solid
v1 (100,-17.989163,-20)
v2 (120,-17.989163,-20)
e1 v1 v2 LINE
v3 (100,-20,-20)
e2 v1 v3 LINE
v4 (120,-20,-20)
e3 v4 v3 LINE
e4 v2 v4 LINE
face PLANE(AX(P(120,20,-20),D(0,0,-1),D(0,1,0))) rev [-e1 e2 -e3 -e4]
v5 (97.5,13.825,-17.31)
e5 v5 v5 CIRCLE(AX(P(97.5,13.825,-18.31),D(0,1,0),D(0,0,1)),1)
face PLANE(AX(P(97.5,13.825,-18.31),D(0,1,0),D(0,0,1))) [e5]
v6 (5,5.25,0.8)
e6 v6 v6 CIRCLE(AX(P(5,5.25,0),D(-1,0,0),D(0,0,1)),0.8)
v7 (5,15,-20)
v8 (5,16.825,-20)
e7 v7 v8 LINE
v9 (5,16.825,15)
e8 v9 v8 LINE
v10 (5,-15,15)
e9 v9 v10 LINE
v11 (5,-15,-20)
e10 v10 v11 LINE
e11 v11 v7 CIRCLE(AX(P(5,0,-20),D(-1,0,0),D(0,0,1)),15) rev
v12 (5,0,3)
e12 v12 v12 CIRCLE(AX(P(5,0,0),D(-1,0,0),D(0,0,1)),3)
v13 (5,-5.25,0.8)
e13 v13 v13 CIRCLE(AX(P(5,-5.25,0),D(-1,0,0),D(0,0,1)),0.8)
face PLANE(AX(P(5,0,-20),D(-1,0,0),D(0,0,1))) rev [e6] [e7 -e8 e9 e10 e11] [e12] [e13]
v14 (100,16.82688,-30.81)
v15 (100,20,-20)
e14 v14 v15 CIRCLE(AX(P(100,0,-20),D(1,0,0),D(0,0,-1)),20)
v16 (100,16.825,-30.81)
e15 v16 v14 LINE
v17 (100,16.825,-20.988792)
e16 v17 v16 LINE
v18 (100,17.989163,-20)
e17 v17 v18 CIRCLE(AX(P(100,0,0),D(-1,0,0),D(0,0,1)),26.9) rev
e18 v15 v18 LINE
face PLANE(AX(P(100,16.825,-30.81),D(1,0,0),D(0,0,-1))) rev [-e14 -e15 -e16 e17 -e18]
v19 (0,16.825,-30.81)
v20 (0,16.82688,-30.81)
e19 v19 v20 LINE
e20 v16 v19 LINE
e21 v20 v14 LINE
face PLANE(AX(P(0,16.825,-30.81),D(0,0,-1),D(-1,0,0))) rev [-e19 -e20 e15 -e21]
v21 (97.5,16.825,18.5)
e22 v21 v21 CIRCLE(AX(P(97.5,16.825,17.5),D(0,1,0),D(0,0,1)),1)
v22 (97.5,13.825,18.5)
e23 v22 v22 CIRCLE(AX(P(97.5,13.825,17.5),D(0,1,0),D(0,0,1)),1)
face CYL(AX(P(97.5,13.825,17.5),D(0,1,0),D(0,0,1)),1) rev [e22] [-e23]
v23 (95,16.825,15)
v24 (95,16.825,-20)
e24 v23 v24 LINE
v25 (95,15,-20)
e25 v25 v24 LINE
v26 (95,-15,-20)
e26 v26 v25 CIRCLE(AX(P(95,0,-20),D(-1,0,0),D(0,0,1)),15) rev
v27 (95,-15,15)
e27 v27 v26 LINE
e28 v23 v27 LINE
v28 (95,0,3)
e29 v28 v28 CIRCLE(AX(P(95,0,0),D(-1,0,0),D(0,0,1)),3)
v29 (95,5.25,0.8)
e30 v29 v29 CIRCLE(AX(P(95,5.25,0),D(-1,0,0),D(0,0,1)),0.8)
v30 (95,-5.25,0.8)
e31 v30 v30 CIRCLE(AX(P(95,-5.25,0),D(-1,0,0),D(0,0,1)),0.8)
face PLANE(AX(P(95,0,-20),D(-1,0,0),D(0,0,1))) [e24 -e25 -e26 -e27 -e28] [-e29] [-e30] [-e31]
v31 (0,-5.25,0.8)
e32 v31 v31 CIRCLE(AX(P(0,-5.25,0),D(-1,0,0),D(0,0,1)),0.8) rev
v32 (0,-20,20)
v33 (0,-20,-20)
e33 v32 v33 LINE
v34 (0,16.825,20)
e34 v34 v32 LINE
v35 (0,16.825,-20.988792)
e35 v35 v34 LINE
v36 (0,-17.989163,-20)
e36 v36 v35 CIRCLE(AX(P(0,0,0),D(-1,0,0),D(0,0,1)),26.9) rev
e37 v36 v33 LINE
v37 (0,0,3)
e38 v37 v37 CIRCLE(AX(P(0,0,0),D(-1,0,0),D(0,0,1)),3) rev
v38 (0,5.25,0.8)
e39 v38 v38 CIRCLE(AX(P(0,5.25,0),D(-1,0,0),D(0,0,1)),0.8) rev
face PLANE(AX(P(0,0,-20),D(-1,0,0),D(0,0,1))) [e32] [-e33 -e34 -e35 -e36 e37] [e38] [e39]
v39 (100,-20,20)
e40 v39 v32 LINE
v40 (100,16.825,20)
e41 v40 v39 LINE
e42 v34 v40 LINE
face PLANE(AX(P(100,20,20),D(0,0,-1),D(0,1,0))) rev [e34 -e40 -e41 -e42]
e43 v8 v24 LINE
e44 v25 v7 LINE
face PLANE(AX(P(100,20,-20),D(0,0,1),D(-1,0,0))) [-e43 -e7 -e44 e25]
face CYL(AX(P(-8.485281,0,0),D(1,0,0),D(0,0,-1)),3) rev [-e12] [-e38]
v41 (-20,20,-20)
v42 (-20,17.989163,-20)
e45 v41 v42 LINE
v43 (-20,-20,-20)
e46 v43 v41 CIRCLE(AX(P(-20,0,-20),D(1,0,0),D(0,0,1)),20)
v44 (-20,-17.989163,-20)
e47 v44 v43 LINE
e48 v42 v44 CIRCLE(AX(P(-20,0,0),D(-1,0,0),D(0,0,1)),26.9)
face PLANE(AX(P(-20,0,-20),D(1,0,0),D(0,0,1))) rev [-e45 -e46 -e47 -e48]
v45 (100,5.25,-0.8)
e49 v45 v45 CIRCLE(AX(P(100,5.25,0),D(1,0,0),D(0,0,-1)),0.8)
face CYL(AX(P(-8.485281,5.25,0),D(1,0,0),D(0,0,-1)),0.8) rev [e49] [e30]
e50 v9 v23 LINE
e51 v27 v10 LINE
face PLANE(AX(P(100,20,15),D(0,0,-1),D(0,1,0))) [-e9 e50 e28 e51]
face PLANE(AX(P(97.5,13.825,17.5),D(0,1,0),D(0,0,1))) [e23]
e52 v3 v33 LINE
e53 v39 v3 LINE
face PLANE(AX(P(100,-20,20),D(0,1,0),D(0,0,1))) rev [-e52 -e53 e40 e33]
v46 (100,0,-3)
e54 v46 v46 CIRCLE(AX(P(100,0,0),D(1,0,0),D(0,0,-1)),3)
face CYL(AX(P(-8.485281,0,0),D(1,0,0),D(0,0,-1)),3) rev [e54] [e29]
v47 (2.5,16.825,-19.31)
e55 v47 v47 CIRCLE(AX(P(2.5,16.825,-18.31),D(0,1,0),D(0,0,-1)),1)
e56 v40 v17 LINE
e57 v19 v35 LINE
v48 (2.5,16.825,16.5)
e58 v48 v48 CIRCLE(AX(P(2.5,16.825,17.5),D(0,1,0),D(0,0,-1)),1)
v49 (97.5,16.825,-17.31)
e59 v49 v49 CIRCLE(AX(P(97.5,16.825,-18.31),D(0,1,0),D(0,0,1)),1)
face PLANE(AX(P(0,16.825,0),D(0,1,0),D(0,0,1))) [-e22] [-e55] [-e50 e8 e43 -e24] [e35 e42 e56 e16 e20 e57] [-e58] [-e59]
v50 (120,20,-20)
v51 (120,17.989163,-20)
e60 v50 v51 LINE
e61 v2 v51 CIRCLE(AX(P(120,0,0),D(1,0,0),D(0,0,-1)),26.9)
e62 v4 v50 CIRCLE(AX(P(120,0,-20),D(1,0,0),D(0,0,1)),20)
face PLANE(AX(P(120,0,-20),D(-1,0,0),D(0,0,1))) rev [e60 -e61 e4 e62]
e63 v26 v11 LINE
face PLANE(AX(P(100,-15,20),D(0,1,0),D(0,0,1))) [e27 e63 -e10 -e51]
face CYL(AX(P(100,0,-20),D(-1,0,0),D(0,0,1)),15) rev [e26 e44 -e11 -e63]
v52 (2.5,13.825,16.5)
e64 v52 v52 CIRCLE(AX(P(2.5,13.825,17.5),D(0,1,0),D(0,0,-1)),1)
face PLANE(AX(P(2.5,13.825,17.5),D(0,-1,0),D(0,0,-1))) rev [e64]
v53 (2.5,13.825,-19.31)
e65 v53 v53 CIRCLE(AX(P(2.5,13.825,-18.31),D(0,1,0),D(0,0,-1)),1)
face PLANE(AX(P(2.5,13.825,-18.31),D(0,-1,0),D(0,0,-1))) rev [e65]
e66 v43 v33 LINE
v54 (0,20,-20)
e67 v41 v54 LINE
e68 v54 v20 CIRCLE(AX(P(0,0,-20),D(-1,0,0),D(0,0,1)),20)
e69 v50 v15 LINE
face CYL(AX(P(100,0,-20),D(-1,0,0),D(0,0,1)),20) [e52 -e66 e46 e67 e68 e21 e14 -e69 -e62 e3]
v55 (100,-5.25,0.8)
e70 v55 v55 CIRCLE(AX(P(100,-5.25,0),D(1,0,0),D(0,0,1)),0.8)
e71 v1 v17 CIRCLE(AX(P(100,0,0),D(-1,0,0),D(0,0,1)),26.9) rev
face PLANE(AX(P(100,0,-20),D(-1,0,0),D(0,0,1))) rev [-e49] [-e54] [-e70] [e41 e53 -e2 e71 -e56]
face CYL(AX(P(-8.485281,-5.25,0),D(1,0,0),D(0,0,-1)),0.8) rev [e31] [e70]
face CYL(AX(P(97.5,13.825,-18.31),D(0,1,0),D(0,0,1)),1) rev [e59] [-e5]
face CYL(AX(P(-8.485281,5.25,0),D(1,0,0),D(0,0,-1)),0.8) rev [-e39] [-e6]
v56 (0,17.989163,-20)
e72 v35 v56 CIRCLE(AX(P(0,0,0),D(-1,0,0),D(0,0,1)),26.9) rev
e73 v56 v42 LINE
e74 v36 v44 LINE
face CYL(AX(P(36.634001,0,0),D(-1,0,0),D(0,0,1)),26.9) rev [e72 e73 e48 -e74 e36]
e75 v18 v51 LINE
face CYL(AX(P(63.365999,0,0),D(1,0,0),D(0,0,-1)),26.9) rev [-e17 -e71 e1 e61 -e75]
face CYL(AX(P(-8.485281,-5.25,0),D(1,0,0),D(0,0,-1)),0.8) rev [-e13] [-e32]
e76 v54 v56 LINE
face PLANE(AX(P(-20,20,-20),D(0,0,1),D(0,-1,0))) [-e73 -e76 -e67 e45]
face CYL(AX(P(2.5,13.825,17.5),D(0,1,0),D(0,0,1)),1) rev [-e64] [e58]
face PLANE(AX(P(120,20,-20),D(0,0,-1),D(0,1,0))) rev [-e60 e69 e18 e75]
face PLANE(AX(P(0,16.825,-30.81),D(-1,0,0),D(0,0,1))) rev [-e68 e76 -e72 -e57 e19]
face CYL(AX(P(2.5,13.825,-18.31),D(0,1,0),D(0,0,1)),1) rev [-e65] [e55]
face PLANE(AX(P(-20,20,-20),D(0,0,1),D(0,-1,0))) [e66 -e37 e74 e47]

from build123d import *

# Parameters (mm, degrees)
BOSS_EXTRUDE1_DEPTH = 100
SHELL3_START        = 5
SHELL3_DEPTH        = 90
BOSS_EXTRUDE2_DEPTH = 20
SKETCH7_W           = 100
SKETCH7_H           = 50.81
CUT_EXTRUDE6_DEPTH  = 3.175
CUT_EXTRUDE1_REACH  = 130.062
SKETCH2_R           = 0.8
SKETCH2_R_2         = 3
SKETCH8_R           = 1
CUT_EXTRUDE7_DEPTH  = 3
CUT_EXTRUDE8_DEPTH  = 20
CUT_EXTRUDE9_START  = -20
CUT_EXTRUDE9_DEPTH  = 20


# Read off the part's stored shape, not the designer's step: Shell3
with BuildPart() as part:
    # Sketch1 → Boss-Extrude1 (new body)
    with BuildSketch(Plane(origin=(0, 0, 0), x_dir=(0, 0, -1), z_dir=(1, 0, 0))):
        with BuildLine():
            Line((-20, 20), (20, 20))
            ThreePointArc((20, 20), (40, 0), (20, -20))
            Line((20, -20), (-20, -20))
            Line((-20, -20), (-20, 20))
        make_face()
    extrude(amount=BOSS_EXTRUDE1_DEPTH)

    # Shell3 outline → Shell3 (cut)
    with BuildSketch(Plane.YZ.offset(SHELL3_START)):
        with BuildLine():
            Line((15, -20), (20, -20))
            Line((20, -20), (20, 15))
            Line((20, 15), (-15, 15))
            Line((-15, 15), (-15, -20))
            ThreePointArc((-15, -20), (0, -35), (15, -20))
        make_face()
    extrude(amount=SHELL3_DEPTH, mode=Mode.SUBTRACT)

    # Sketch9 → Boss-Extrude2 (add)
    with BuildSketch(Plane(origin=(100, 0, 0), x_dir=(0, 0, -1), z_dir=(1, 0, 0))):
        with BuildLine():
            Line((20, 20), (20, -20))
            ThreePointArc((20, -20), (40, 0), (20, 20))
        make_face()
    boss_extrude2 = extrude(amount=BOSS_EXTRUDE2_DEPTH)

    # Mirror1: Boss-Extrude2 across plane
    add(boss_extrude2.mirror(Plane(origin=(50, 0, 0), x_dir=(0, 0, 1), z_dir=(1, 0, 0))))

    # Sketch7 → Cut-Extrude6 (cut)
    with BuildSketch(Plane(origin=(0, 20, 0), x_dir=(1, 0, 0), z_dir=(0, 1, 0))):
        with Locations((50, 5.405)):
            Rectangle(SKETCH7_W, SKETCH7_H)
    extrude(amount=-CUT_EXTRUDE6_DEPTH, mode=Mode.SUBTRACT)

    # Cut-Extrude1: up to this face of the body (flat: up to its plane)
    cut_extrude1_end = Plane(part.part.faces().sort_by_distance((0, -1.5875, 0))[0])
    # Sketch2 → Cut-Extrude1 (cut, up to the picked face)
    with BuildSketch(Plane(origin=(100, 0, 0), x_dir=(0, 0, -1), z_dir=(1, 0, 0)), mode=Mode.PRIVATE) as cut_extrude1_sk1:
        with Locations(Location((0, -5.25, 0), (0, 0, 180))):
            Circle(SKETCH2_R)
    cut_extrude1_tool1 = split(extrude(cut_extrude1_sk1.sketch, amount=-CUT_EXTRUDE1_REACH, mode=Mode.PRIVATE), bisect_by=cut_extrude1_end, keep=Keep.BOTH, mode=Mode.PRIVATE)
    # Sketch2 → Cut-Extrude1 (cut, up to the picked face)
    with BuildSketch(Plane(origin=(100, 0, 0), x_dir=(0, 0, -1), z_dir=(1, 0, 0)), mode=Mode.PRIVATE) as cut_extrude1_sk2:
        with Locations(Location((0, 0, 0), (0, 0, 180))):
            Circle(SKETCH2_R_2)
    cut_extrude1_tool2 = split(extrude(cut_extrude1_sk2.sketch, amount=-CUT_EXTRUDE1_REACH, mode=Mode.PRIVATE), bisect_by=cut_extrude1_end, keep=Keep.BOTH, mode=Mode.PRIVATE)
    # Sketch2 → Cut-Extrude1 (cut, up to the picked face)
    with BuildSketch(Plane(origin=(100, 0, 0), x_dir=(0, 0, -1), z_dir=(1, 0, 0)), mode=Mode.PRIVATE) as cut_extrude1_sk3:
        with Locations(Location((0, 5.25, 0), (0, 0, 180))):
            Circle(SKETCH2_R)
    cut_extrude1_tool3 = split(extrude(cut_extrude1_sk3.sketch, amount=-CUT_EXTRUDE1_REACH, mode=Mode.PRIVATE), bisect_by=cut_extrude1_end, keep=Keep.BOTH, mode=Mode.PRIVATE)
    add(cut_extrude1_tool1.solids().sort_by(Axis((100, -5.25, 0), (-1, 0, 0)))[0], mode=Mode.SUBTRACT)
    add(cut_extrude1_tool2.solids().sort_by(Axis((100, 0, 0), (-1, 0, 0)))[0], mode=Mode.SUBTRACT)
    add(cut_extrude1_tool3.solids().sort_by(Axis((100, 5.25, 0), (-1, 0, 0)))[0], mode=Mode.SUBTRACT)

    # Sketch8 → Cut-Extrude7 (cut)
    with BuildSketch(Plane(origin=(0, 16.825, 0), x_dir=(1, 0, 0), z_dir=(0, 1, 0))):
        with Locations(Location((97.5, -17.5, 0), (0, 0, 270))):
            Circle(SKETCH8_R)
        with Locations(Location((97.5, 18.31, 0), (0, 0, 270))):
            Circle(SKETCH8_R)
        with Locations(Location((2.5, -17.5, 0), (0, 0, 90))):
            Circle(SKETCH8_R)
        with Locations(Location((2.5, 18.31, 0), (0, 0, 90))):
            Circle(SKETCH8_R)
    extrude(amount=-CUT_EXTRUDE7_DEPTH, mode=Mode.SUBTRACT)

    # Sketch10 → Cut-Extrude8 (cut)
    with BuildSketch(Plane(origin=(120, 0, 0), x_dir=(0, 0, -1), z_dir=(1, 0, 0))):
        with BuildLine():
            Line((20, 17.989163405), (20, -17.989163405))
            ThreePointArc((20, -17.989163405), (26.9, 0), (20, 17.989163405))
        make_face()
    extrude(amount=-CUT_EXTRUDE8_DEPTH, mode=Mode.SUBTRACT)

    # Sketch11 → Cut-Extrude9 (cut)
    with BuildSketch(Plane.ZY.offset(20).offset(CUT_EXTRUDE9_START)):
        with BuildLine():
            Line((-20, 17.989163405), (-20, -17.989163405))
            ThreePointArc((-20, -17.989163405), (-26.9, 0), (-20, 17.989163405))
        make_face()
    extrude(amount=CUT_EXTRUDE9_DEPTH, mode=Mode.SUBTRACT)


solid = part.part
